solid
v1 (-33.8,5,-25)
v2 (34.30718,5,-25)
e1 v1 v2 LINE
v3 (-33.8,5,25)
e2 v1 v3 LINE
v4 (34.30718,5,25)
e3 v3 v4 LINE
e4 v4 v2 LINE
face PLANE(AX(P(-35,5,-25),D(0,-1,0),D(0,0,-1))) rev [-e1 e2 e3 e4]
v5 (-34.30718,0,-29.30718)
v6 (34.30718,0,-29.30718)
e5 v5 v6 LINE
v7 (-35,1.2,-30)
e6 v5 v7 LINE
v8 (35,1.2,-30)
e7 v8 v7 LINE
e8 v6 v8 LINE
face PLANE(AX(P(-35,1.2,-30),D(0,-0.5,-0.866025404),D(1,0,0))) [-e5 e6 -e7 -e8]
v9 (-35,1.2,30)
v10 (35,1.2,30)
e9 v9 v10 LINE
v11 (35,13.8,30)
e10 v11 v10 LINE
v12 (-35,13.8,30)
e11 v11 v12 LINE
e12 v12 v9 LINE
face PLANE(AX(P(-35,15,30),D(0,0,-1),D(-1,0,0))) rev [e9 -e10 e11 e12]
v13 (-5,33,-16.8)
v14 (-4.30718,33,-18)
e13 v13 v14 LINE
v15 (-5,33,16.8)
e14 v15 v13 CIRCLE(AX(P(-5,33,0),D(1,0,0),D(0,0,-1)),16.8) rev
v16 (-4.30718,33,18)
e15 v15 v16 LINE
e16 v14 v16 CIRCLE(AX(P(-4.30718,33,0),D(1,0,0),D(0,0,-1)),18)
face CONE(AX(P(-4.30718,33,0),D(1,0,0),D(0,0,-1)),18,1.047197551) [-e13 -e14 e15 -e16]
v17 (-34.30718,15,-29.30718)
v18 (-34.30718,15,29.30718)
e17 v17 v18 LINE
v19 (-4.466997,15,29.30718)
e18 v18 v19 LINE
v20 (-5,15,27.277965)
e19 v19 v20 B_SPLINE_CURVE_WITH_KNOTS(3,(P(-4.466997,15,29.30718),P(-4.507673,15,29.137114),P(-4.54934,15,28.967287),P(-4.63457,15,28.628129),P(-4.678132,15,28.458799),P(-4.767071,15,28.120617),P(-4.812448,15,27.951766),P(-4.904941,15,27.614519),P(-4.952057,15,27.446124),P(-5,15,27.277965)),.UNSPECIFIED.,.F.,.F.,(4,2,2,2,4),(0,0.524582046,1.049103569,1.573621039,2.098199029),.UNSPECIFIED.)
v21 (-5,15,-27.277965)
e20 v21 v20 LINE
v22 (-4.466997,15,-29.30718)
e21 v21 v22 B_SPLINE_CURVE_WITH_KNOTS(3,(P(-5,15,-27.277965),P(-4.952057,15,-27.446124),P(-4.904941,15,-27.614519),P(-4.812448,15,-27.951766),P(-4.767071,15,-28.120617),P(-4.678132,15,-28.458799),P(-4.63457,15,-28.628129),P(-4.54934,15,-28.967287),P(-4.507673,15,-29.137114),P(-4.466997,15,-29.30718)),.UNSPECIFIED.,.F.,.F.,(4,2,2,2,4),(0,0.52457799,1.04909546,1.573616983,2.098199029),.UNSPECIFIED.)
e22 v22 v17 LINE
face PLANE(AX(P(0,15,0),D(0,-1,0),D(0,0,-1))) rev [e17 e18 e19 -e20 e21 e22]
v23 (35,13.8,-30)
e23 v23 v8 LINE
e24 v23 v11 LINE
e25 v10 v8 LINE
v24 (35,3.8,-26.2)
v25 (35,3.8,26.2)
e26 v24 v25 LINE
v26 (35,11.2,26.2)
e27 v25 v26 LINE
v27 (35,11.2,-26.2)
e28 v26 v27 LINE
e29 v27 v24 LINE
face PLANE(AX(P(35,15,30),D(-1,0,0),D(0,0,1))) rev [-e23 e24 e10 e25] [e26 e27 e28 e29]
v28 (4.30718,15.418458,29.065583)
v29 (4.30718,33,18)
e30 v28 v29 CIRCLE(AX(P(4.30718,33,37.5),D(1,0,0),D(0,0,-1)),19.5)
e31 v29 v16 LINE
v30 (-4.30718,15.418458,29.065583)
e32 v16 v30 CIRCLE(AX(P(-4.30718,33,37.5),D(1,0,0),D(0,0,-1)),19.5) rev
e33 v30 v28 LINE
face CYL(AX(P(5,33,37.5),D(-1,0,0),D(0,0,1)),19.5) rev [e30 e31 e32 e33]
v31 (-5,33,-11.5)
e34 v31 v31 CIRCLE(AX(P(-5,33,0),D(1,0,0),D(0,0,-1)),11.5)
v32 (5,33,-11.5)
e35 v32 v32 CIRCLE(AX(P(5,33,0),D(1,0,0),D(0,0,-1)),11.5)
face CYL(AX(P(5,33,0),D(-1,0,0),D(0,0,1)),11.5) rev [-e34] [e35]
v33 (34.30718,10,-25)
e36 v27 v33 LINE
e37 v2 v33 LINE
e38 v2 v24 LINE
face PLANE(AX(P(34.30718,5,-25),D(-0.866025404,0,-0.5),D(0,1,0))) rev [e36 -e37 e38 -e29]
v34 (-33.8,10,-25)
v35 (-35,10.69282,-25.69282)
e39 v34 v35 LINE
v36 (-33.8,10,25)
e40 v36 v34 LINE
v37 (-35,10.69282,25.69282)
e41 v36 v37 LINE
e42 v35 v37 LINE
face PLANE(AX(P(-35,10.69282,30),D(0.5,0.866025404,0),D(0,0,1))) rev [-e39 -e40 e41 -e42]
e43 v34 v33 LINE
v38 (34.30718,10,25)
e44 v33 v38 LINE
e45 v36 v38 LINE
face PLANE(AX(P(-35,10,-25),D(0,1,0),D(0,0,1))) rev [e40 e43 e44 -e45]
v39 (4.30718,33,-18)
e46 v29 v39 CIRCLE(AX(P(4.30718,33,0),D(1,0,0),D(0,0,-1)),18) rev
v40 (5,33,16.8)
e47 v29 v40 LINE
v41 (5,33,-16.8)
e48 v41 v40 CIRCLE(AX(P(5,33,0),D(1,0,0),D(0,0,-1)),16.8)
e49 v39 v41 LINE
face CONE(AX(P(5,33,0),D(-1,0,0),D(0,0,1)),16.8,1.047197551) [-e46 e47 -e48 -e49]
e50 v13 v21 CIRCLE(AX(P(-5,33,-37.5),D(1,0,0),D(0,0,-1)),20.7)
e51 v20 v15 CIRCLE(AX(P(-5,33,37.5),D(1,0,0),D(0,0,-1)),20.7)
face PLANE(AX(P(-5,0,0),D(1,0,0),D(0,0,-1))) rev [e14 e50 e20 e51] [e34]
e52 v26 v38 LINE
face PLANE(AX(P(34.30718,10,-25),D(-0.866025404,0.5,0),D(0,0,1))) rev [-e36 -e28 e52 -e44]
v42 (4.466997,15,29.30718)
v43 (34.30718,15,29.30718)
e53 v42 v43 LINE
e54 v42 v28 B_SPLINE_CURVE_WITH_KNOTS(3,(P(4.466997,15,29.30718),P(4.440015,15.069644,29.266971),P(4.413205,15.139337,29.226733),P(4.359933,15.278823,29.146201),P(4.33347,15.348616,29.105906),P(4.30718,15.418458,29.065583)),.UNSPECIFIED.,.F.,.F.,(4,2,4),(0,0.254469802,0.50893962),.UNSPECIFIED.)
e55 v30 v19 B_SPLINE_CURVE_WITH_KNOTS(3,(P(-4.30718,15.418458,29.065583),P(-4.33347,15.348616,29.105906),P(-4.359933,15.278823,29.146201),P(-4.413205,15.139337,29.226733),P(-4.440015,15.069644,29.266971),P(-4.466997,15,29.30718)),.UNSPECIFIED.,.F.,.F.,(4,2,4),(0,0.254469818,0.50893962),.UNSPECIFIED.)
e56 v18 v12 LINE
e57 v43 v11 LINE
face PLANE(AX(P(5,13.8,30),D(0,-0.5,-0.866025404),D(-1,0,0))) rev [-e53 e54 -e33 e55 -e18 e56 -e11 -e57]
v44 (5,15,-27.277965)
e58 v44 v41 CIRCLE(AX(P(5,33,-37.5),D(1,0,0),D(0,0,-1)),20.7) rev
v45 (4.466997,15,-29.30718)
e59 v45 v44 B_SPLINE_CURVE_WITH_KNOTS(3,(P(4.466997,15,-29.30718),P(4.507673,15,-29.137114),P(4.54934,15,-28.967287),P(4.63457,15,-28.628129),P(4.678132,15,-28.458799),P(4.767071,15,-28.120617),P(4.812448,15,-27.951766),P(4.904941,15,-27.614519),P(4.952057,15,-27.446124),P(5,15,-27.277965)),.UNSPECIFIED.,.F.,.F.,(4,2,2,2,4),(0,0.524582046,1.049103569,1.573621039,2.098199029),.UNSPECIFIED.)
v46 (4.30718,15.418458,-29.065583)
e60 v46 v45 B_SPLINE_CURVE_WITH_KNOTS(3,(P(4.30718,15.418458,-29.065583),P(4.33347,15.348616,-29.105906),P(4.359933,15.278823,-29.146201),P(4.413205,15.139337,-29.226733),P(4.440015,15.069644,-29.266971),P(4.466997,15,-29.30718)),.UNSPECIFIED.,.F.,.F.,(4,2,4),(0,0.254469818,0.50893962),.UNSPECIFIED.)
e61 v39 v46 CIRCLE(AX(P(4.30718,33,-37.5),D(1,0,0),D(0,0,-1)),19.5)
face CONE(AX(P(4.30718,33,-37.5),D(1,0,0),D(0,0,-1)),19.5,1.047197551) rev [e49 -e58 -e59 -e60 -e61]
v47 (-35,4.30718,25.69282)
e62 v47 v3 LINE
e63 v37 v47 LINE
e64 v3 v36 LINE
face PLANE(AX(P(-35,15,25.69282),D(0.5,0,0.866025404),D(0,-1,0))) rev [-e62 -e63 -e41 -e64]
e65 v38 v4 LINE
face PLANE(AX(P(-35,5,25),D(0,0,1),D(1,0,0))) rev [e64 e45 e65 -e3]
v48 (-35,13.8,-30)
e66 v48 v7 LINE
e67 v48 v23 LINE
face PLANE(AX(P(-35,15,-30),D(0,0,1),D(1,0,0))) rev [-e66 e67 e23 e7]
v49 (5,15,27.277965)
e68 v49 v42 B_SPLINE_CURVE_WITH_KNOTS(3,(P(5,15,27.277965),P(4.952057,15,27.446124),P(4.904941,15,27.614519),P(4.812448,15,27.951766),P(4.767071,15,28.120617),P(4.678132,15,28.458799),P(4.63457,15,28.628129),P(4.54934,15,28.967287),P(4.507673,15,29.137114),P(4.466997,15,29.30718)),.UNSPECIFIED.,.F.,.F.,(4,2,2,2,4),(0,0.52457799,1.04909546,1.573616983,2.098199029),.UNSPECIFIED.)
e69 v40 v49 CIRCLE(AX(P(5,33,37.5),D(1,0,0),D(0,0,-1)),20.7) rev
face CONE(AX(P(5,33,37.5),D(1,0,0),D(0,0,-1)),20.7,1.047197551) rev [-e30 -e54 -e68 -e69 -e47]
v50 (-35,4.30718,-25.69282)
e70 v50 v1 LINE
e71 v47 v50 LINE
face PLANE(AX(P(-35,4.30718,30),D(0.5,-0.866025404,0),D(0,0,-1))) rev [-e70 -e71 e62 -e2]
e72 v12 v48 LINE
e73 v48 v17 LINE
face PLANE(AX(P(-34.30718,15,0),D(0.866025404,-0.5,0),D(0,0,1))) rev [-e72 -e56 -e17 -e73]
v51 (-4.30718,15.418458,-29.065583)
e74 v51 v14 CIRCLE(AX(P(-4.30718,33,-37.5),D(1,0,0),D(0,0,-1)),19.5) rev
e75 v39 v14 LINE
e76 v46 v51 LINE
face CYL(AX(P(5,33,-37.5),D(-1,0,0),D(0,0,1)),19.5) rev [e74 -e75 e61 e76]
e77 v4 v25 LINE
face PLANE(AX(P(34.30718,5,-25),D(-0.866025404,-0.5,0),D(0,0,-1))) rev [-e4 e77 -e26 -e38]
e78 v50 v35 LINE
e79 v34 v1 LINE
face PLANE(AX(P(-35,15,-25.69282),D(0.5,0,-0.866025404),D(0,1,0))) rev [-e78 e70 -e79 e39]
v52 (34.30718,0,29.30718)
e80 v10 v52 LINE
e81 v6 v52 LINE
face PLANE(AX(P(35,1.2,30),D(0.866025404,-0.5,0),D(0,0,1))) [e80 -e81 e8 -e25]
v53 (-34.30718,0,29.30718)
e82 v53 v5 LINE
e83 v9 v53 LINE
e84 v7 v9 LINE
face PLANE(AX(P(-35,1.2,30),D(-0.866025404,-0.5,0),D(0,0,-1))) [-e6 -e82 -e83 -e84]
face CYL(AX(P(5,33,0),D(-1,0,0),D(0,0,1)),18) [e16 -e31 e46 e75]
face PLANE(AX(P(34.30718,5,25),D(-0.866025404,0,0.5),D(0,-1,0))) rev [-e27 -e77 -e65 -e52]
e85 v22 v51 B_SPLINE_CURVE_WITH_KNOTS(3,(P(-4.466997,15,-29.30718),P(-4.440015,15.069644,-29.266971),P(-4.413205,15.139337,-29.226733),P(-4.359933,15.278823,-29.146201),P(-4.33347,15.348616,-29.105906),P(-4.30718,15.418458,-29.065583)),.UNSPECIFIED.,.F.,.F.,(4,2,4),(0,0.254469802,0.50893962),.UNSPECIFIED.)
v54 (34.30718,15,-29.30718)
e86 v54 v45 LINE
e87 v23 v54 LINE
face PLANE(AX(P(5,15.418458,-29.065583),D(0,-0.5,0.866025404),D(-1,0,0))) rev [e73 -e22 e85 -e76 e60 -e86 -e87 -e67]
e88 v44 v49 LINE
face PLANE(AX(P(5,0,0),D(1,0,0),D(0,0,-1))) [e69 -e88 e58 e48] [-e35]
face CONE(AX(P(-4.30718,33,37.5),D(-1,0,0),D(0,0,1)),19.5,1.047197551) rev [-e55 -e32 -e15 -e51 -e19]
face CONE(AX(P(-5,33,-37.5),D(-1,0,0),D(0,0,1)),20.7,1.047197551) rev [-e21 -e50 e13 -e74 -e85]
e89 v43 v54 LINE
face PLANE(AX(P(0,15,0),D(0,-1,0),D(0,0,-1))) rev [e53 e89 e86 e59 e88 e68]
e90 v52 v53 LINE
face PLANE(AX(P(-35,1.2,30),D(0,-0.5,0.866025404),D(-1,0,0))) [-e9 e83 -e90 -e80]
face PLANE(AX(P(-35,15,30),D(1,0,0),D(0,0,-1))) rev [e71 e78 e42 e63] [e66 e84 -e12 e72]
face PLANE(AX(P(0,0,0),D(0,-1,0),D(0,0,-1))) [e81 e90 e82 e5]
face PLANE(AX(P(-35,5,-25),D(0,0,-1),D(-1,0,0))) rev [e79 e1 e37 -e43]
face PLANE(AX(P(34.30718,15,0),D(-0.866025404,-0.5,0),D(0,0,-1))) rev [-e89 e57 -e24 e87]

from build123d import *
from OCP.BRepFilletAPI import BRepFilletAPI_MakeChamfer

# Parameters (mm, degrees)
SKETCH_1_W               = 70
SKETCH_1_H               = 60
EXTRUDE_1_DEPTH          = 15
SKETCH_2_R               = 11.5
EXTRUDE_3_DEPTH          = 5
CUT_EXTRUDE_1_DEPTH      = 69.745908969
CUT_EXTRUDE_1_DEPTH_BACK = 69.745908969
SKETCH_3_W               = 50
SKETCH_3_H               = 5
CHAMFER_1_SIZE           = 1.2
CHAMFER_1_SIZE2          = 0.692820323
CHAMFER_2_SIZE           = 1.2
CHAMFER_2_SIZE_2         = 0.692820323
CHAMFER_3_SIZE           = 1.2
CHAMFER_3_SIZE_2         = 0.692820323
CHAMFER_4_SIZE           = 1.2
CHAMFER_4_SIZE2          = 0.692820323


with BuildPart() as part:
    # 스케치1 → 보스-돌출1 (new body)
    with BuildSketch(Plane(origin=(0, 0, 0), x_dir=(1, 0, 0), z_dir=(0, 1, 0))):
        Rectangle(SKETCH_1_W, SKETCH_1_H)
    extrude(amount=EXTRUDE_1_DEPTH)

    # 스케치2 → 보스-돌출3 (add, symmetric)
    with BuildSketch(Plane(origin=(0, 0, 0), x_dir=(0, 0, -1), z_dir=(1, 0, 0))):
        with BuildLine():
            ThreePointArc((30, 15), (21.27501926, 22.183346174), (18, 33))
            ThreePointArc((18, 33), (0, 51), (-18, 33))
            ThreePointArc((-18, 33), (-21.27501926, 22.183346174), (-30, 15))
            Line((-30, 15), (30, 15))
        make_face()
        with Locations((0, 33)):
            Circle(SKETCH_2_R, mode=Mode.SUBTRACT)
    extrude(amount=EXTRUDE_3_DEPTH, both=True)

    # 스케치3 → 컷-돌출1 (cut, two sides: drawn at the far end of the back side and taken through both)
    with BuildSketch(Plane(origin=(0, 0, 0), x_dir=(0, 0, -1), z_dir=(1, 0, 0)).offset(-CUT_EXTRUDE_1_DEPTH_BACK)):
        with Locations((0, 7.5)):
            Rectangle(SKETCH_3_W, SKETCH_3_H)
    extrude(amount=CUT_EXTRUDE_1_DEPTH + CUT_EXTRUDE_1_DEPTH_BACK, mode=Mode.SUBTRACT)

    # 모따기1: one chamfer whose edges measure the first distance from different faces: ONE call of the kernel's chamfer builder (chamfer() names one face for all edges)
    chamfer_1_edges_1 = [part.edges().sort_by_distance(p)[0] for p in [
        (0, 0, 30),
    ]]
    chamfer_1_side_1 = [part.faces().sort_by_distance(p)[0] for p in [
        (0, 7.5, 30),
    ]]
    chamfer_1_edges_2 = [part.edges().sort_by_distance(p)[0] for p in [
        (-35, 0, 0),
    ]]
    chamfer_1_side_2 = [part.faces().sort_by_distance(p)[0] for p in [
        (-35, 7.5, -29.381534156),
    ]]
    chamfer_1_edges_3 = [part.edges().sort_by_distance(p)[0] for p in [
        (0, 0, -30),
    ]]
    chamfer_1_side_3 = [part.faces().sort_by_distance(p)[0] for p in [
        (0, 7.5, -30),
    ]]
    chamfer_1_edges_4 = [part.edges().sort_by_distance(p)[0] for p in [
        (35, 0, 0),
    ]]
    chamfer_1_side_4 = [part.faces().sort_by_distance(p)[0] for p in [
        (35, 7.5, 29.381534156),
    ]]
    chamfer_1 = BRepFilletAPI_MakeChamfer(part.part.solid().wrapped)
    for e in chamfer_1_edges_1:
        chamfer_1.Add(CHAMFER_1_SIZE, CHAMFER_1_SIZE2, e.wrapped, chamfer_1_side_1[0].wrapped)  # the first distance lies on this face
    for e in chamfer_1_edges_2:
        chamfer_1.Add(CHAMFER_1_SIZE, CHAMFER_1_SIZE2, e.wrapped, chamfer_1_side_2[0].wrapped)  # the first distance lies on this face
    for e in chamfer_1_edges_3:
        chamfer_1.Add(CHAMFER_1_SIZE, CHAMFER_1_SIZE2, e.wrapped, chamfer_1_side_3[0].wrapped)  # the first distance lies on this face
    for e in chamfer_1_edges_4:
        chamfer_1.Add(CHAMFER_1_SIZE, CHAMFER_1_SIZE2, e.wrapped, chamfer_1_side_4[0].wrapped)  # the first distance lies on this face
    add(Compound.cast(chamfer_1.Shape()), mode=Mode.REPLACE)

    # 모따기2
    # the kernel refuses this chamfer: 1.2, 0.98830445, 0.692820323 mm, written as the material it takes off along each edge
    with BuildSketch(Plane(origin=(-35, 15, -33.104502906), x_dir=(0, -1, 0), z_dir=(0, 0, 1)), Plane(origin=(35, 15, 33.104502906), x_dir=(0, -1, 0), z_dir=(0, 0, -1))) as chamfer_2_piece_1:
        Polygon((CHAMFER_2_SIZE, 0), (0, CHAMFER_2_SIZE_2), (0, 0), align=None)
    extrude(amount=66.209005811, mode=Mode.SUBTRACT)
    with BuildSketch(Plane(origin=(-5, 15, -30), x_dir=(0, 0, 1), z_dir=(-1, 0, 0)), Plane(origin=(38.104502906, 15, -30), x_dir=(0, 0, 1), z_dir=(-1, 0, 0))) as chamfer_2_piece_2:
        Polygon((CHAMFER_2_SIZE_2, 0), (0, -CHAMFER_2_SIZE), (0, 0), align=None)
    extrude(amount=33.104502906, mode=Mode.SUBTRACT)
    with BuildSketch(Plane(origin=(5, 15, 30), x_dir=(0, -1, 0), z_dir=(1, 0, 0)), Plane(origin=(-38.104502906, 15, 30), x_dir=(0, -1, 0), z_dir=(1, 0, 0))) as chamfer_2_piece_3:
        Polygon((CHAMFER_2_SIZE, 0), (0, CHAMFER_2_SIZE_2), (0, 0), align=None)
    extrude(amount=33.104502906, mode=Mode.SUBTRACT)
    with BuildSketch(Plane(origin=(-5, 15, -30), x_dir=(0, -1, 0), z_dir=(1, 0, 0)), Plane(origin=(5, 15, 30), x_dir=(0, -1, 0), z_dir=(-1, 0, 0))) as chamfer_2_piece_4:
        with BuildLine():
            Line((CHAMFER_2_SIZE, 0), (-0.41845847, -0.934417434))
            ThreePointArc((-0.41845847, -0.934417434), (-0.211061153, -0.487718993), (0, 0))
            Line((0, 0), (CHAMFER_2_SIZE, 0))
        make_face()
    extrude(amount=10, mode=Mode.SUBTRACT)

    # 모따기3
    # the kernel refuses this chamfer: 1.2, 0.692820323 mm, written as the material it takes off along each edge
    with BuildSketch(Plane(origin=(5, 33, -37.5), x_dir=(0, -0.958795780822353, 0.2840961996881595), z_dir=(0, -0.2840961996881595, -0.958795780822353))) as chamfer_3_piece_1_section:
        Polygon((19.5 + CHAMFER_3_SIZE, 0), (19.5, CHAMFER_3_SIZE_2), (19.5, 0), align=None)
    chamfer_3_piece_1 = revolve(axis=Axis((5, 33, -37.5), (-1, 0, 0)), revolution_arc=73.495168323, mode=Mode.PRIVATE)
    chamfer_3_piece_1 = split(chamfer_3_piece_1, bisect_by=Plane(origin=(5, 15, -37.5), z_dir=(0, 1, 0)), keep=Keep.TOP, mode=Mode.PRIVATE)
    add(chamfer_3_piece_1, mode=Mode.SUBTRACT)
    with BuildSketch(Plane(origin=(5, 33, 37.5), x_dir=(0, 0, -1), z_dir=(0, 1, 0))) as chamfer_3_piece_2_section:
        Polygon((19.5, CHAMFER_3_SIZE_2), (19.5 + CHAMFER_3_SIZE, 0), (19.5, 0), align=None)
    chamfer_3_piece_2 = revolve(axis=Axis((5, 33, 37.5), (-1, 0, 0)), revolution_arc=73.495168323, mode=Mode.PRIVATE)
    chamfer_3_piece_2 = split(chamfer_3_piece_2, bisect_by=Plane(origin=(5, 15, 37.5), z_dir=(0, 1, 0)), keep=Keep.TOP, mode=Mode.PRIVATE)
    add(chamfer_3_piece_2, mode=Mode.SUBTRACT)
    with BuildSketch(Plane(origin=(5, 33, 0), x_dir=(0, 0, -1), z_dir=(0, -1, 0))) as chamfer_3_piece_3:
        Polygon((18 - CHAMFER_3_SIZE, 0), (18, -CHAMFER_3_SIZE_2), (18, 0), align=None)
    revolve(axis=Axis((5, 33, 0), (1, 0, 0)), revolution_arc=180, mode=Mode.SUBTRACT)
    with BuildSketch(Plane(origin=(-5, 33, -37.5), x_dir=(0, -0.958795780822353, 0.2840961996881595), z_dir=(0, -0.2840961996881595, -0.958795780822353))) as chamfer_3_piece_4_section:
        Polygon((19.5 + CHAMFER_3_SIZE, 0), (19.5, -CHAMFER_3_SIZE_2), (19.5, 0), align=None)
    chamfer_3_piece_4 = revolve(axis=Axis((-5, 33, -37.5), (-1, 0, 0)), revolution_arc=73.495168323, mode=Mode.PRIVATE)
    chamfer_3_piece_4 = split(chamfer_3_piece_4, bisect_by=Plane(origin=(-5, 15, -37.5), z_dir=(0, 1, 0)), keep=Keep.TOP, mode=Mode.PRIVATE)
    add(chamfer_3_piece_4, mode=Mode.SUBTRACT)
    with BuildSketch(Plane(origin=(-5, 33, 0), x_dir=(0, 0, -1), z_dir=(0, -1, 0))) as chamfer_3_piece_5:
        Polygon((18 - CHAMFER_3_SIZE, 0), (18, CHAMFER_3_SIZE_2), (18, 0), align=None)
    revolve(axis=Axis((-5, 33, 0), (1, 0, 0)), revolution_arc=180, mode=Mode.SUBTRACT)
    with BuildSketch(Plane(origin=(-5, 33, 37.5), x_dir=(0, 0, -1), z_dir=(0, 1, 0))) as chamfer_3_piece_6_section:
        Polygon((19.5, -CHAMFER_3_SIZE_2), (19.5 + CHAMFER_3_SIZE, 0), (19.5, 0), align=None)
    chamfer_3_piece_6 = revolve(axis=Axis((-5, 33, 37.5), (-1, 0, 0)), revolution_arc=73.495168323, mode=Mode.PRIVATE)
    chamfer_3_piece_6 = split(chamfer_3_piece_6, bisect_by=Plane(origin=(-5, 15, 37.5), z_dir=(0, 1, 0)), keep=Keep.TOP, mode=Mode.PRIVATE)
    add(chamfer_3_piece_6, mode=Mode.SUBTRACT)

    # 모따기4: one chamfer whose edges measure the first distance from different faces: ONE call of the kernel's chamfer builder (chamfer() names one face for all edges)
    chamfer_4_edges_1 = [part.edges().sort_by_distance(p)[0] for p in [
        (-35, 7.5, 25),
    ]]
    chamfer_4_side_1 = [part.faces().sort_by_distance(p)[0] for p in [
        (0, 7.5, 25),
    ]]
    chamfer_4_edges_2 = [part.edges().sort_by_distance(p)[0] for p in [
        (-35, 10, 0),
    ]]
    chamfer_4_side_2 = [part.faces().sort_by_distance(p)[0] for p in [
        (0, 10, 0),
    ]]
    chamfer_4_edges_3 = [part.edges().sort_by_distance(p)[0] for p in [
        (-35, 7.5, -25),
    ]]
    chamfer_4_side_3 = [part.faces().sort_by_distance(p)[0] for p in [
        (0, 7.5, -25),
    ]]
    chamfer_4_edges_4 = [part.edges().sort_by_distance(p)[0] for p in [
        (-35, 5, 0),
    ]]
    chamfer_4_side_4 = [part.faces().sort_by_distance(p)[0] for p in [
        (0, 5, 0),
    ]]
    chamfer_4_edges_5 = [part.edges().sort_by_distance(p)[0] for p in [
        (35, 7.5, 25),
        (35, 5, 0),
        (35, 7.5, -25),
        (35, 10, 0),
    ]]
    chamfer_4_side_5 = [part.faces().sort_by_distance(p)[0] for p in [
        (35, 1.813087269, 0),
    ]]
    chamfer_4 = BRepFilletAPI_MakeChamfer(part.part.solid().wrapped)
    for e in chamfer_4_edges_1:
        chamfer_4.Add(CHAMFER_4_SIZE, CHAMFER_4_SIZE2, e.wrapped, chamfer_4_side_1[0].wrapped)  # the first distance lies on this face
    for e in chamfer_4_edges_2:
        chamfer_4.Add(CHAMFER_4_SIZE, CHAMFER_4_SIZE2, e.wrapped, chamfer_4_side_2[0].wrapped)  # the first distance lies on this face
    for e in chamfer_4_edges_3:
        chamfer_4.Add(CHAMFER_4_SIZE, CHAMFER_4_SIZE2, e.wrapped, chamfer_4_side_3[0].wrapped)  # the first distance lies on this face
    for e in chamfer_4_edges_4:
        chamfer_4.Add(CHAMFER_4_SIZE, CHAMFER_4_SIZE2, e.wrapped, chamfer_4_side_4[0].wrapped)  # the first distance lies on this face
    for e in chamfer_4_edges_5:
        chamfer_4.Add(CHAMFER_4_SIZE, CHAMFER_4_SIZE2, e.wrapped, chamfer_4_side_5[0].wrapped)  # the first distance lies on this face
    add(Compound.cast(chamfer_4.Shape()), mode=Mode.REPLACE)


solid = part.part
